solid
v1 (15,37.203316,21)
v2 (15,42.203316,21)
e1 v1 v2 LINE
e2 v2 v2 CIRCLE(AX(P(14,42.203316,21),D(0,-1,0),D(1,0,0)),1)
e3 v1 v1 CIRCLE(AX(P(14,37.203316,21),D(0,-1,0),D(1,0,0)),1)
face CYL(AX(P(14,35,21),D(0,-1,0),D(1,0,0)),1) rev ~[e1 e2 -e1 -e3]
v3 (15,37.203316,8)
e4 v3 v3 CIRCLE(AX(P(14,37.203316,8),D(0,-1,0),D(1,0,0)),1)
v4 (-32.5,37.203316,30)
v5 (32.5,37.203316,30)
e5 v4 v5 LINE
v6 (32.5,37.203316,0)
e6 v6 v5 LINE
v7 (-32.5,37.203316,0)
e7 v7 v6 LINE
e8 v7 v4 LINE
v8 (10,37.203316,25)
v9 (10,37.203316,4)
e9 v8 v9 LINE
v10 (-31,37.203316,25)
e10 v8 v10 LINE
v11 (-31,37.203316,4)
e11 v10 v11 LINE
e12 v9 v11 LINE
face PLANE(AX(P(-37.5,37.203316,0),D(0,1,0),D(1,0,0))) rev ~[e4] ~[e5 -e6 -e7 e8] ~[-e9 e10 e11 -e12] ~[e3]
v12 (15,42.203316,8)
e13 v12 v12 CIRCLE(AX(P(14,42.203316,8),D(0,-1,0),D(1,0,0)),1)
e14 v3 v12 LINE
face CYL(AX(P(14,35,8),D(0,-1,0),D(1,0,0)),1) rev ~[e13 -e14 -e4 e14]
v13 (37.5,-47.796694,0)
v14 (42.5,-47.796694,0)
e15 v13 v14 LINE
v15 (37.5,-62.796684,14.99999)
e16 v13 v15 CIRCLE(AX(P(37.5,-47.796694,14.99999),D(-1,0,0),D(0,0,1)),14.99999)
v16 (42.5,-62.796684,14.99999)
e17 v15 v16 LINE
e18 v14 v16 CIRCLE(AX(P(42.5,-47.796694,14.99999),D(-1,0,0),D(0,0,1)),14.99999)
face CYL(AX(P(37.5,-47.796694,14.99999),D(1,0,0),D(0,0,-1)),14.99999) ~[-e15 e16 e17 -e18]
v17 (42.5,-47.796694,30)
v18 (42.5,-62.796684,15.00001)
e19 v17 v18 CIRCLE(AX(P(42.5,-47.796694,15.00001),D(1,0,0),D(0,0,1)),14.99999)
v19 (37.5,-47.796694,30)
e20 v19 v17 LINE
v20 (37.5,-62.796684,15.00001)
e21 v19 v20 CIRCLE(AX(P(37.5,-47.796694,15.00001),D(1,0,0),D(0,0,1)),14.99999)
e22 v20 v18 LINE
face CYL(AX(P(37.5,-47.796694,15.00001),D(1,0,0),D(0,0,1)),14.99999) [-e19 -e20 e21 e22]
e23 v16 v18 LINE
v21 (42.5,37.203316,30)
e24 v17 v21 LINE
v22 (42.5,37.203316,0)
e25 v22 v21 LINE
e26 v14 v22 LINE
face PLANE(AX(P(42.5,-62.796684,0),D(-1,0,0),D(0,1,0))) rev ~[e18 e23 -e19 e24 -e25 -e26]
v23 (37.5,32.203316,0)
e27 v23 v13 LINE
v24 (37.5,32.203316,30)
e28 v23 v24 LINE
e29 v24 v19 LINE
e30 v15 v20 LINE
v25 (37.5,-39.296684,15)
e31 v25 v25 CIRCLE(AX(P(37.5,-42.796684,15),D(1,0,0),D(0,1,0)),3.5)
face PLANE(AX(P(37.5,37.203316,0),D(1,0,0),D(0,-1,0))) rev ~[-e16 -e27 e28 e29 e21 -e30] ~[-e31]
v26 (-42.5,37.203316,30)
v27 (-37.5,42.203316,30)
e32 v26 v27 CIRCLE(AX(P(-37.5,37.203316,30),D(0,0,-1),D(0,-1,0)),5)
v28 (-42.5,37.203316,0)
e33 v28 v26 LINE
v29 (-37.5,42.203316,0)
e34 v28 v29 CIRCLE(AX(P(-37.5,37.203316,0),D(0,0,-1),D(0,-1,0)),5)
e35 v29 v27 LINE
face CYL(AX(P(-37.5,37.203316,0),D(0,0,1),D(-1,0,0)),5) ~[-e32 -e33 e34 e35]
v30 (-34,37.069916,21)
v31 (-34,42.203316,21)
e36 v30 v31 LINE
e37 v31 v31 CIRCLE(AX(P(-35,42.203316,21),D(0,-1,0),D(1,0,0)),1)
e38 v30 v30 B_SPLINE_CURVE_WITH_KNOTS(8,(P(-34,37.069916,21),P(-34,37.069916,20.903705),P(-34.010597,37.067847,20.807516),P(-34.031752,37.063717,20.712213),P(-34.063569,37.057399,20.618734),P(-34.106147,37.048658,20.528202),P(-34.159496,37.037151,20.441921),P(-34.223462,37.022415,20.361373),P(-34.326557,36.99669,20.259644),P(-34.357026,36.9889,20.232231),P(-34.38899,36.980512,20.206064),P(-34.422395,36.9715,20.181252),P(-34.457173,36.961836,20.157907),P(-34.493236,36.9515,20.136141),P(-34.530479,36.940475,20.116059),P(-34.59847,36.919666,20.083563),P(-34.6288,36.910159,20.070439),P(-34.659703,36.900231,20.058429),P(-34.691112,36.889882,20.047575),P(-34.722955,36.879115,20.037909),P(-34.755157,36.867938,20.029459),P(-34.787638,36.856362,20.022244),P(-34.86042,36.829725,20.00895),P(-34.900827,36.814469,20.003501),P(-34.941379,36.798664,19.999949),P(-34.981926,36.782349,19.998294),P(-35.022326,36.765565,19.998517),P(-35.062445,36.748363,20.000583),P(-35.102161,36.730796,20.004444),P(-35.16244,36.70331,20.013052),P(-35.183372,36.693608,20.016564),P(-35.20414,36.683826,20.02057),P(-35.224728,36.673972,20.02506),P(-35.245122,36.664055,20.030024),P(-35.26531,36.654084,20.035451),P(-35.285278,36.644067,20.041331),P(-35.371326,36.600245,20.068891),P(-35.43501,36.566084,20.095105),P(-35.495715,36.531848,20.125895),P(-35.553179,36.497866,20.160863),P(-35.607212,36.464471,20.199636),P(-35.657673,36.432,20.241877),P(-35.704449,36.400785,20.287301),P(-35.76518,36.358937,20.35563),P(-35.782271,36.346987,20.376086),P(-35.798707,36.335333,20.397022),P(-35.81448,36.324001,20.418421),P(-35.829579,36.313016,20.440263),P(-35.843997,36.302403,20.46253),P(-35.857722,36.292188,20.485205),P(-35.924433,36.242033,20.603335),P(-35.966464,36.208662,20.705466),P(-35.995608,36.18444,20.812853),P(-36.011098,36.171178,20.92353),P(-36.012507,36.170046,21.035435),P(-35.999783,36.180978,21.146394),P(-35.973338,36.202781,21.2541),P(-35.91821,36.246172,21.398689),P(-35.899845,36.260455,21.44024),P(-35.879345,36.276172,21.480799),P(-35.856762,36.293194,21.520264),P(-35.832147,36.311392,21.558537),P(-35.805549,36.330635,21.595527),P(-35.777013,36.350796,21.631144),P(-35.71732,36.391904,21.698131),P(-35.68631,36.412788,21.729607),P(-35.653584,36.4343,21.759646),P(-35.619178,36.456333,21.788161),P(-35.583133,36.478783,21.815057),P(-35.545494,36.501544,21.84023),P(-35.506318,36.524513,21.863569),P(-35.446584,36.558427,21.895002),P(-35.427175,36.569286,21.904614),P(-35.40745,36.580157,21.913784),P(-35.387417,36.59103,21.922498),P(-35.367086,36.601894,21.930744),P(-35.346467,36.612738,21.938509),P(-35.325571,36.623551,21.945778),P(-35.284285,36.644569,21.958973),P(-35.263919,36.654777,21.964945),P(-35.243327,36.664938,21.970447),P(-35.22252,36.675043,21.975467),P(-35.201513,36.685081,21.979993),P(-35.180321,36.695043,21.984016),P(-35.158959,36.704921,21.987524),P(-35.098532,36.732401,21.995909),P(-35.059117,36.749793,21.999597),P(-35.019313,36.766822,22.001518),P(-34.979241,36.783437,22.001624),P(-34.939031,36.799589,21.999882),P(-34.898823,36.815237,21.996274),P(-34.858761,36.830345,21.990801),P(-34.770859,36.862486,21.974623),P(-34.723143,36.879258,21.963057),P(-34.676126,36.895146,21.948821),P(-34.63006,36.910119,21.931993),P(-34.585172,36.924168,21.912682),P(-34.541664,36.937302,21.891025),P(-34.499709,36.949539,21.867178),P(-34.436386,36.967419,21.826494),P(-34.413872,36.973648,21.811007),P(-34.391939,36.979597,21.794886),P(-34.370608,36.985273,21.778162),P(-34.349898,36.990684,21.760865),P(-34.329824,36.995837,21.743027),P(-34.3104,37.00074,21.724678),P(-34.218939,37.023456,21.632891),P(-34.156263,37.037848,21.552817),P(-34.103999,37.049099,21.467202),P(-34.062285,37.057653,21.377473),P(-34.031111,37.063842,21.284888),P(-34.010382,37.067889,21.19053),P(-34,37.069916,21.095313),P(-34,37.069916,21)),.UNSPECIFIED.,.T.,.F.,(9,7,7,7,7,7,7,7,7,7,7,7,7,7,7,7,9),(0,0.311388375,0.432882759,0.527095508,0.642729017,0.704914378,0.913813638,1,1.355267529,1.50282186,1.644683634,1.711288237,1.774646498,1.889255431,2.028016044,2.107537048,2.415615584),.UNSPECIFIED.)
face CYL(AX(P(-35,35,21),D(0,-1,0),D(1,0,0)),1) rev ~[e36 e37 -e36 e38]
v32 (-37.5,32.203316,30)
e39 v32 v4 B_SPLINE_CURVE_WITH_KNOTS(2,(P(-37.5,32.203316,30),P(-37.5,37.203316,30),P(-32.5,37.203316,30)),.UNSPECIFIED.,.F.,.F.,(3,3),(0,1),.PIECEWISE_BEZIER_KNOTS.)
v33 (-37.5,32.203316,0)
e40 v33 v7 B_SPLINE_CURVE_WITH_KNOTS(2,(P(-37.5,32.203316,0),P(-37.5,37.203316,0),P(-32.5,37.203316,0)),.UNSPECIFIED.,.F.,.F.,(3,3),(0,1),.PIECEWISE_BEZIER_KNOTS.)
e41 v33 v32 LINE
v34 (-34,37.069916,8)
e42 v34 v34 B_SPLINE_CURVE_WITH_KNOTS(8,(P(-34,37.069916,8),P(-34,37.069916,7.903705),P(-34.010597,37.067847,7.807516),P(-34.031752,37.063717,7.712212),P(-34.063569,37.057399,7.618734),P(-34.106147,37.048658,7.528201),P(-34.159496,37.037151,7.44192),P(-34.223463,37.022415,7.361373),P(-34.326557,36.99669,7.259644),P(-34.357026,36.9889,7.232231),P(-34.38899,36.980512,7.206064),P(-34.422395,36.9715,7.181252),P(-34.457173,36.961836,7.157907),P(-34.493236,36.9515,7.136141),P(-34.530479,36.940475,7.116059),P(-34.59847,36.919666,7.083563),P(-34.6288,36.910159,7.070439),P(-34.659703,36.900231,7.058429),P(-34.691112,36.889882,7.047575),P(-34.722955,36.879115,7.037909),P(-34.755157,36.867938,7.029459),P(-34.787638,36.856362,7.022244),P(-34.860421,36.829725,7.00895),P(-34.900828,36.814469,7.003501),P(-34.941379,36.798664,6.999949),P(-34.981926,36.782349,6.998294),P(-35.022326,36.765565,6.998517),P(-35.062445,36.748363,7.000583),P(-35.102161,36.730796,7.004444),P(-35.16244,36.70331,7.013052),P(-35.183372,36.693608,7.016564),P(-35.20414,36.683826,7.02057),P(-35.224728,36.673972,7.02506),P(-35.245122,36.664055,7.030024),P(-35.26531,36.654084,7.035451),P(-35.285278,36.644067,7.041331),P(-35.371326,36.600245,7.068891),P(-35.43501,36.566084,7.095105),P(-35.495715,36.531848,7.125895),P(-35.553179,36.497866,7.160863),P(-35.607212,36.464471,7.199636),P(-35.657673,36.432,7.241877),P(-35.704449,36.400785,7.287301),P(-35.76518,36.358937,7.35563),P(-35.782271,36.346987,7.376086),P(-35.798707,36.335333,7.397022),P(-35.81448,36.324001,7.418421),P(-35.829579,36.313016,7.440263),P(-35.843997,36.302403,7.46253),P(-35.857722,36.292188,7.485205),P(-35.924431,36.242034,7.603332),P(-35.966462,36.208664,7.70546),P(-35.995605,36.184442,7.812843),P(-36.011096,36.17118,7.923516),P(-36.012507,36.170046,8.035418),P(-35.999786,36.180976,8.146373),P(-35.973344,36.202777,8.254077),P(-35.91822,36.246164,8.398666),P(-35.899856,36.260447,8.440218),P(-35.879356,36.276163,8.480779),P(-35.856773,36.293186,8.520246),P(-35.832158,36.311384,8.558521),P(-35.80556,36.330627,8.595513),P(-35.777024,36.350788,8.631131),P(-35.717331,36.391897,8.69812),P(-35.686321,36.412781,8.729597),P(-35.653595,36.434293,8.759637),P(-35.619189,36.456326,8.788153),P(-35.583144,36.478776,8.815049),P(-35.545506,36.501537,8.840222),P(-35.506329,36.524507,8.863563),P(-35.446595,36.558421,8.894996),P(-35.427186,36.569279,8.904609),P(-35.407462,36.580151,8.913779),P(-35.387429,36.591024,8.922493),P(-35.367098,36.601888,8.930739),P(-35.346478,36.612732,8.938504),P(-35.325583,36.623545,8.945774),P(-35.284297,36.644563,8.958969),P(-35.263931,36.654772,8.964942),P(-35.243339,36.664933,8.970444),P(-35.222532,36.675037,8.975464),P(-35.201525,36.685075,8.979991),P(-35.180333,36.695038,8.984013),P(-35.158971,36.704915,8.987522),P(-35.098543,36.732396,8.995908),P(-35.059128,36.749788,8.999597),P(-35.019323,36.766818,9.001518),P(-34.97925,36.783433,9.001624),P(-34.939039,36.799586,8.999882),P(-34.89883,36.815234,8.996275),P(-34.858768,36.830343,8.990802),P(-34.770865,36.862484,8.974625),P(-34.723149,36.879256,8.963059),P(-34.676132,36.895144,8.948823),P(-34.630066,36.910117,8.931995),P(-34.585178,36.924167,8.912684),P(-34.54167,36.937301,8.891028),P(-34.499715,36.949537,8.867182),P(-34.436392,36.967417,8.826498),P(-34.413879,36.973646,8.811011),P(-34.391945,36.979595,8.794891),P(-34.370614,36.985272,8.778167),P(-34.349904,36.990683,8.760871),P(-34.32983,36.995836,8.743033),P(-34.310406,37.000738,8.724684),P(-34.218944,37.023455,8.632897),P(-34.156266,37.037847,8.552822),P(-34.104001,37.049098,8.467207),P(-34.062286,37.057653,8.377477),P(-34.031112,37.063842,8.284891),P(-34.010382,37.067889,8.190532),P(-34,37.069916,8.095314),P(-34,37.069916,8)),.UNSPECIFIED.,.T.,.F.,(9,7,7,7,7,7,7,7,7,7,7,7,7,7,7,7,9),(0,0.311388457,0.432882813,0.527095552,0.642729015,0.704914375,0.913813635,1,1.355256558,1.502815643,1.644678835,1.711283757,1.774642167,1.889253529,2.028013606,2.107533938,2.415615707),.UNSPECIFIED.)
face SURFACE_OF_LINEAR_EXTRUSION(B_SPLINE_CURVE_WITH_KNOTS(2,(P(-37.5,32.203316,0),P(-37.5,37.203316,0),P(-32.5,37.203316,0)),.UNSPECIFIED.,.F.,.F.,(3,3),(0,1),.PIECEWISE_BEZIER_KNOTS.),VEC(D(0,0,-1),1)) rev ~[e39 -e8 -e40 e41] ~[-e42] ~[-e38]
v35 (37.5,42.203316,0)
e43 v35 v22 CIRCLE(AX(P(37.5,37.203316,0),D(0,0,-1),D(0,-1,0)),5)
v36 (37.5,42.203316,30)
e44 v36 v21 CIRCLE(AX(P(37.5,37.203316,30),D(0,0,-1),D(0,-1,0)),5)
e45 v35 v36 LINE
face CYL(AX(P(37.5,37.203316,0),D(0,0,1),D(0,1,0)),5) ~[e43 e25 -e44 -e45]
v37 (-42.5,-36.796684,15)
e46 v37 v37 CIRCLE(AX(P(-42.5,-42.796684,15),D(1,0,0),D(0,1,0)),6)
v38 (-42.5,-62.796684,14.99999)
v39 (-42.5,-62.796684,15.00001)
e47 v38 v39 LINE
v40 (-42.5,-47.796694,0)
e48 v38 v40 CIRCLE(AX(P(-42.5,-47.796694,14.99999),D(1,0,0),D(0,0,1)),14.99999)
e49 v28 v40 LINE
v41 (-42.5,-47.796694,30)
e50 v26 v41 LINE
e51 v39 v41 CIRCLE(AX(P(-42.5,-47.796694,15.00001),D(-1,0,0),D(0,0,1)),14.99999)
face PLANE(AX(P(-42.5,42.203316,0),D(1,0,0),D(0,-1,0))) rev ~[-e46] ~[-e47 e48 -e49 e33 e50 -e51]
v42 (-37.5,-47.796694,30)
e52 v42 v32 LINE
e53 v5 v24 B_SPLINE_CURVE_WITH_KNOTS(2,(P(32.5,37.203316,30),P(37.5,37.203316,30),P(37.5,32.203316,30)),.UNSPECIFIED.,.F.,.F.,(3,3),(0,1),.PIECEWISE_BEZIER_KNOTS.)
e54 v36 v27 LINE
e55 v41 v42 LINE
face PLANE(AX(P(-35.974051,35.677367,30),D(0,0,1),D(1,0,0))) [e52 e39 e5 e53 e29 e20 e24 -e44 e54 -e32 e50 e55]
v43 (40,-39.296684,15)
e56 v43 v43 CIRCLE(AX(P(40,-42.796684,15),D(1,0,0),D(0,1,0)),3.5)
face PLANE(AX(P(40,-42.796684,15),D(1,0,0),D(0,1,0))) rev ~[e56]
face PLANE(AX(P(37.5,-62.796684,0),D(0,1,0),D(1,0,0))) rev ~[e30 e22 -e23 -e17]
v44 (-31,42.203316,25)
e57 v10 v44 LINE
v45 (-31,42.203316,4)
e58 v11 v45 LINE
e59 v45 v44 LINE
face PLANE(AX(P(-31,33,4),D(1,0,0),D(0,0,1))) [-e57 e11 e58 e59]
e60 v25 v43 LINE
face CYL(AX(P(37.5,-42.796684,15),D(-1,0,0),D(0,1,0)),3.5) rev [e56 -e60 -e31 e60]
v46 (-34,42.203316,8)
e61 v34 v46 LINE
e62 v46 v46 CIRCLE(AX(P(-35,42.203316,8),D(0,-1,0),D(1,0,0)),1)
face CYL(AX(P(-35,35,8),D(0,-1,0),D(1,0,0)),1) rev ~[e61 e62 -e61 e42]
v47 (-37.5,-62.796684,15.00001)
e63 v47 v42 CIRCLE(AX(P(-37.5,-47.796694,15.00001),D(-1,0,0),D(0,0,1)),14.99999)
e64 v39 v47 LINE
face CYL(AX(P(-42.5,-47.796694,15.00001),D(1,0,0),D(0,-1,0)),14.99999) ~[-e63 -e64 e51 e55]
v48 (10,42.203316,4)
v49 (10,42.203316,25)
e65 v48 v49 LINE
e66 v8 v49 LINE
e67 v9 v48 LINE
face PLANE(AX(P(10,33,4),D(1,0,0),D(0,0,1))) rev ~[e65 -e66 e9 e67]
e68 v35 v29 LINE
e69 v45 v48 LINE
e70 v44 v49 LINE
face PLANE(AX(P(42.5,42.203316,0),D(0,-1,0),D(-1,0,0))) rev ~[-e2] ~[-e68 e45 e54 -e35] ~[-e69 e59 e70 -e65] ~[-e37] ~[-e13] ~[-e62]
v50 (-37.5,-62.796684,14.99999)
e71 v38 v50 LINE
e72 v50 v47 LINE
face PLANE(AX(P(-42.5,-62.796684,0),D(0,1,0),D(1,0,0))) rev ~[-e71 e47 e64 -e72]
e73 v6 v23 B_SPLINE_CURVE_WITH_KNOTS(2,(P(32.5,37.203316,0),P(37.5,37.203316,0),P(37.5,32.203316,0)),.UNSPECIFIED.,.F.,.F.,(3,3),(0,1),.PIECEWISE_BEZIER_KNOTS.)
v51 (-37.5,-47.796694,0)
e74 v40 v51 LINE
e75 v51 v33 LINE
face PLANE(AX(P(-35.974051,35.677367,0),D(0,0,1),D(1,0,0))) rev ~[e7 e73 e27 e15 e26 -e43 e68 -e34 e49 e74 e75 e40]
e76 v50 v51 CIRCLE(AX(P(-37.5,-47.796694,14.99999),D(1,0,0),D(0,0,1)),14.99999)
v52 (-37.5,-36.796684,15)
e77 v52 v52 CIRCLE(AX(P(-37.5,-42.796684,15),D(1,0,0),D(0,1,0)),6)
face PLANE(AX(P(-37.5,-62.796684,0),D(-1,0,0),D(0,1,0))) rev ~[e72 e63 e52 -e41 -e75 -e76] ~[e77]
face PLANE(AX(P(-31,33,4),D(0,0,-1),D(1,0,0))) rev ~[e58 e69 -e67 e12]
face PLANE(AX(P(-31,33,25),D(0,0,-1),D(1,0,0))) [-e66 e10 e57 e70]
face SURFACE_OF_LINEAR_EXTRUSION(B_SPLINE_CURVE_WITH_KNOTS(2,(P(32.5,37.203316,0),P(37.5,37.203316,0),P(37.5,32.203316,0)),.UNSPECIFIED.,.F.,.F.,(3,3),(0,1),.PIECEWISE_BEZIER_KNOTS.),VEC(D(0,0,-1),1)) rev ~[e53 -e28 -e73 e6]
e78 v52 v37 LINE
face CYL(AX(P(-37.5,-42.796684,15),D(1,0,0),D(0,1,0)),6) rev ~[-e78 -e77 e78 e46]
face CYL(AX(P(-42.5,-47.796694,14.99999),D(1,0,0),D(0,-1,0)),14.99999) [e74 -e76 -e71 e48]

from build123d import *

# Parameters (mm, degrees)
F1_DEPTH    = 30
F3_START    = 37.5
F2_R        = 3.5
F3_DEPTH    = 2.5
F5_START    = -37.5
F4_R        = 6
F5_DEPTH    = 5
F6_R        = 14.99999
F7_R        = 5
F8_T1_DEPTH = 30
F10_START   = -33
F9_W        = 41
F9_H        = 21
F10_DEPTH   = 12
F12_START   = -35
F11_R       = 1
F12_DEPTH   = 10


# Not quite as in the source:
# - a fillet or chamfer that OpenCascade refuses, or shapes differently, is made with other operations: its cross-section is extruded or revolved along the edge and cut away or added
# - a fillet or chamfer is up to 0.001 mm smaller than in the source, because OpenCascade refuses the exact size


with BuildPart() as f1:
    # F0 (on Top) → F1 (new body)
    with BuildSketch(Plane.XY):
        Polygon((-42.5, -62.7966840421), (-37.5, -62.7966840421), (-37.5, 37.2033159579), (37.5, 37.2033159579), (37.5, -62.7966840421), (42.5, -62.7966840421), (42.5, 42.2033159579), (-42.5, 42.2033159579), align=None)
    extrude(amount=F1_DEPTH)

    # F2 (on Right) → F3 (cut)
    with BuildSketch(Plane.YZ.offset(F3_START)):
        with Locations((-42.7966840421, 15)):
            Circle(F2_R)
    extrude(amount=F3_DEPTH, mode=Mode.SUBTRACT)

    # F4 (on Right) → F5 (cut)
    with BuildSketch(Plane.YZ.offset(F5_START)):
        with Locations((-42.7966840421, 15)):
            Circle(F4_R)
    extrude(amount=-F5_DEPTH, mode=Mode.SUBTRACT)

    # F6 (radius 15 in the source; OpenCascade refuses exactly that, so slightly less here)
    f6_edges = [f1.edges().sort_by_distance(p)[0] for p in [
        (40, -62.796684, 30),
        (40, -62.796684, 0),
        (-40, -62.796684, 30),
        (-40, -62.796684, 0),
    ]]
    fillet(f6_edges, radius=F6_R)

    # F7
    f7_edges = [f1.edges().sort_by_distance(p)[0] for p in [
        (-42.5, 42.203316, 15),
        (42.5, 42.203316, 15),
    ]]
    fillet(f7_edges, radius=F7_R)

    # F8: fillet of radius 5 on 2 edges, made by hand

    # F8_s2 → F8_t1 (join)
    with BuildSketch(Plane.XY):
        with BuildLine():
            add(Edge.make_bspline(
                [(-37.5, 32.2033159579), (-37.5, 37.2033159579), (-32.5, 37.2033159579)],
                knots=[0, 0, 0, 1, 1, 1], degree=2, weights=[1, 1, 1]))
            Line((-32.5, 37.2033159579), (-37.5, 37.2033159579))
            Line((-37.5, 37.2033159579), (-37.5, 32.2033159579))
        make_face()
        with BuildLine():
            add(Edge.make_bspline(
                [(32.5, 37.2033159579), (37.5, 37.2033159579), (37.5, 32.2033159579)],
                knots=[0, 0, 0, 1, 1, 1], degree=2, weights=[1, 1, 1]))
            Line((37.5, 32.2033159579), (37.5, 37.2033159579))
            Line((37.5, 37.2033159579), (32.5, 37.2033159579))
        make_face()
    extrude(amount=F8_T1_DEPTH)

    # F9 (on Front) → F10 (cut)
    with BuildSketch(Plane.XZ.offset(F10_START)):
        with Locations((-10.5, 14.5)):
            Rectangle(F9_W, F9_H)
    extrude(amount=-F10_DEPTH, mode=Mode.SUBTRACT)

    # F11 (on Front) → F12 (cut)
    with BuildSketch(Plane.XZ.offset(F12_START)):
        with Locations((14, 21)):
            Circle(F11_R)
        with Locations((14, 8)):
            Circle(F11_R)
        with Locations((-35, 21)):
            Circle(F11_R)
        with Locations((-35, 8)):
            Circle(F11_R)
    extrude(amount=-F12_DEPTH, mode=Mode.SUBTRACT)


solid = f1.part
